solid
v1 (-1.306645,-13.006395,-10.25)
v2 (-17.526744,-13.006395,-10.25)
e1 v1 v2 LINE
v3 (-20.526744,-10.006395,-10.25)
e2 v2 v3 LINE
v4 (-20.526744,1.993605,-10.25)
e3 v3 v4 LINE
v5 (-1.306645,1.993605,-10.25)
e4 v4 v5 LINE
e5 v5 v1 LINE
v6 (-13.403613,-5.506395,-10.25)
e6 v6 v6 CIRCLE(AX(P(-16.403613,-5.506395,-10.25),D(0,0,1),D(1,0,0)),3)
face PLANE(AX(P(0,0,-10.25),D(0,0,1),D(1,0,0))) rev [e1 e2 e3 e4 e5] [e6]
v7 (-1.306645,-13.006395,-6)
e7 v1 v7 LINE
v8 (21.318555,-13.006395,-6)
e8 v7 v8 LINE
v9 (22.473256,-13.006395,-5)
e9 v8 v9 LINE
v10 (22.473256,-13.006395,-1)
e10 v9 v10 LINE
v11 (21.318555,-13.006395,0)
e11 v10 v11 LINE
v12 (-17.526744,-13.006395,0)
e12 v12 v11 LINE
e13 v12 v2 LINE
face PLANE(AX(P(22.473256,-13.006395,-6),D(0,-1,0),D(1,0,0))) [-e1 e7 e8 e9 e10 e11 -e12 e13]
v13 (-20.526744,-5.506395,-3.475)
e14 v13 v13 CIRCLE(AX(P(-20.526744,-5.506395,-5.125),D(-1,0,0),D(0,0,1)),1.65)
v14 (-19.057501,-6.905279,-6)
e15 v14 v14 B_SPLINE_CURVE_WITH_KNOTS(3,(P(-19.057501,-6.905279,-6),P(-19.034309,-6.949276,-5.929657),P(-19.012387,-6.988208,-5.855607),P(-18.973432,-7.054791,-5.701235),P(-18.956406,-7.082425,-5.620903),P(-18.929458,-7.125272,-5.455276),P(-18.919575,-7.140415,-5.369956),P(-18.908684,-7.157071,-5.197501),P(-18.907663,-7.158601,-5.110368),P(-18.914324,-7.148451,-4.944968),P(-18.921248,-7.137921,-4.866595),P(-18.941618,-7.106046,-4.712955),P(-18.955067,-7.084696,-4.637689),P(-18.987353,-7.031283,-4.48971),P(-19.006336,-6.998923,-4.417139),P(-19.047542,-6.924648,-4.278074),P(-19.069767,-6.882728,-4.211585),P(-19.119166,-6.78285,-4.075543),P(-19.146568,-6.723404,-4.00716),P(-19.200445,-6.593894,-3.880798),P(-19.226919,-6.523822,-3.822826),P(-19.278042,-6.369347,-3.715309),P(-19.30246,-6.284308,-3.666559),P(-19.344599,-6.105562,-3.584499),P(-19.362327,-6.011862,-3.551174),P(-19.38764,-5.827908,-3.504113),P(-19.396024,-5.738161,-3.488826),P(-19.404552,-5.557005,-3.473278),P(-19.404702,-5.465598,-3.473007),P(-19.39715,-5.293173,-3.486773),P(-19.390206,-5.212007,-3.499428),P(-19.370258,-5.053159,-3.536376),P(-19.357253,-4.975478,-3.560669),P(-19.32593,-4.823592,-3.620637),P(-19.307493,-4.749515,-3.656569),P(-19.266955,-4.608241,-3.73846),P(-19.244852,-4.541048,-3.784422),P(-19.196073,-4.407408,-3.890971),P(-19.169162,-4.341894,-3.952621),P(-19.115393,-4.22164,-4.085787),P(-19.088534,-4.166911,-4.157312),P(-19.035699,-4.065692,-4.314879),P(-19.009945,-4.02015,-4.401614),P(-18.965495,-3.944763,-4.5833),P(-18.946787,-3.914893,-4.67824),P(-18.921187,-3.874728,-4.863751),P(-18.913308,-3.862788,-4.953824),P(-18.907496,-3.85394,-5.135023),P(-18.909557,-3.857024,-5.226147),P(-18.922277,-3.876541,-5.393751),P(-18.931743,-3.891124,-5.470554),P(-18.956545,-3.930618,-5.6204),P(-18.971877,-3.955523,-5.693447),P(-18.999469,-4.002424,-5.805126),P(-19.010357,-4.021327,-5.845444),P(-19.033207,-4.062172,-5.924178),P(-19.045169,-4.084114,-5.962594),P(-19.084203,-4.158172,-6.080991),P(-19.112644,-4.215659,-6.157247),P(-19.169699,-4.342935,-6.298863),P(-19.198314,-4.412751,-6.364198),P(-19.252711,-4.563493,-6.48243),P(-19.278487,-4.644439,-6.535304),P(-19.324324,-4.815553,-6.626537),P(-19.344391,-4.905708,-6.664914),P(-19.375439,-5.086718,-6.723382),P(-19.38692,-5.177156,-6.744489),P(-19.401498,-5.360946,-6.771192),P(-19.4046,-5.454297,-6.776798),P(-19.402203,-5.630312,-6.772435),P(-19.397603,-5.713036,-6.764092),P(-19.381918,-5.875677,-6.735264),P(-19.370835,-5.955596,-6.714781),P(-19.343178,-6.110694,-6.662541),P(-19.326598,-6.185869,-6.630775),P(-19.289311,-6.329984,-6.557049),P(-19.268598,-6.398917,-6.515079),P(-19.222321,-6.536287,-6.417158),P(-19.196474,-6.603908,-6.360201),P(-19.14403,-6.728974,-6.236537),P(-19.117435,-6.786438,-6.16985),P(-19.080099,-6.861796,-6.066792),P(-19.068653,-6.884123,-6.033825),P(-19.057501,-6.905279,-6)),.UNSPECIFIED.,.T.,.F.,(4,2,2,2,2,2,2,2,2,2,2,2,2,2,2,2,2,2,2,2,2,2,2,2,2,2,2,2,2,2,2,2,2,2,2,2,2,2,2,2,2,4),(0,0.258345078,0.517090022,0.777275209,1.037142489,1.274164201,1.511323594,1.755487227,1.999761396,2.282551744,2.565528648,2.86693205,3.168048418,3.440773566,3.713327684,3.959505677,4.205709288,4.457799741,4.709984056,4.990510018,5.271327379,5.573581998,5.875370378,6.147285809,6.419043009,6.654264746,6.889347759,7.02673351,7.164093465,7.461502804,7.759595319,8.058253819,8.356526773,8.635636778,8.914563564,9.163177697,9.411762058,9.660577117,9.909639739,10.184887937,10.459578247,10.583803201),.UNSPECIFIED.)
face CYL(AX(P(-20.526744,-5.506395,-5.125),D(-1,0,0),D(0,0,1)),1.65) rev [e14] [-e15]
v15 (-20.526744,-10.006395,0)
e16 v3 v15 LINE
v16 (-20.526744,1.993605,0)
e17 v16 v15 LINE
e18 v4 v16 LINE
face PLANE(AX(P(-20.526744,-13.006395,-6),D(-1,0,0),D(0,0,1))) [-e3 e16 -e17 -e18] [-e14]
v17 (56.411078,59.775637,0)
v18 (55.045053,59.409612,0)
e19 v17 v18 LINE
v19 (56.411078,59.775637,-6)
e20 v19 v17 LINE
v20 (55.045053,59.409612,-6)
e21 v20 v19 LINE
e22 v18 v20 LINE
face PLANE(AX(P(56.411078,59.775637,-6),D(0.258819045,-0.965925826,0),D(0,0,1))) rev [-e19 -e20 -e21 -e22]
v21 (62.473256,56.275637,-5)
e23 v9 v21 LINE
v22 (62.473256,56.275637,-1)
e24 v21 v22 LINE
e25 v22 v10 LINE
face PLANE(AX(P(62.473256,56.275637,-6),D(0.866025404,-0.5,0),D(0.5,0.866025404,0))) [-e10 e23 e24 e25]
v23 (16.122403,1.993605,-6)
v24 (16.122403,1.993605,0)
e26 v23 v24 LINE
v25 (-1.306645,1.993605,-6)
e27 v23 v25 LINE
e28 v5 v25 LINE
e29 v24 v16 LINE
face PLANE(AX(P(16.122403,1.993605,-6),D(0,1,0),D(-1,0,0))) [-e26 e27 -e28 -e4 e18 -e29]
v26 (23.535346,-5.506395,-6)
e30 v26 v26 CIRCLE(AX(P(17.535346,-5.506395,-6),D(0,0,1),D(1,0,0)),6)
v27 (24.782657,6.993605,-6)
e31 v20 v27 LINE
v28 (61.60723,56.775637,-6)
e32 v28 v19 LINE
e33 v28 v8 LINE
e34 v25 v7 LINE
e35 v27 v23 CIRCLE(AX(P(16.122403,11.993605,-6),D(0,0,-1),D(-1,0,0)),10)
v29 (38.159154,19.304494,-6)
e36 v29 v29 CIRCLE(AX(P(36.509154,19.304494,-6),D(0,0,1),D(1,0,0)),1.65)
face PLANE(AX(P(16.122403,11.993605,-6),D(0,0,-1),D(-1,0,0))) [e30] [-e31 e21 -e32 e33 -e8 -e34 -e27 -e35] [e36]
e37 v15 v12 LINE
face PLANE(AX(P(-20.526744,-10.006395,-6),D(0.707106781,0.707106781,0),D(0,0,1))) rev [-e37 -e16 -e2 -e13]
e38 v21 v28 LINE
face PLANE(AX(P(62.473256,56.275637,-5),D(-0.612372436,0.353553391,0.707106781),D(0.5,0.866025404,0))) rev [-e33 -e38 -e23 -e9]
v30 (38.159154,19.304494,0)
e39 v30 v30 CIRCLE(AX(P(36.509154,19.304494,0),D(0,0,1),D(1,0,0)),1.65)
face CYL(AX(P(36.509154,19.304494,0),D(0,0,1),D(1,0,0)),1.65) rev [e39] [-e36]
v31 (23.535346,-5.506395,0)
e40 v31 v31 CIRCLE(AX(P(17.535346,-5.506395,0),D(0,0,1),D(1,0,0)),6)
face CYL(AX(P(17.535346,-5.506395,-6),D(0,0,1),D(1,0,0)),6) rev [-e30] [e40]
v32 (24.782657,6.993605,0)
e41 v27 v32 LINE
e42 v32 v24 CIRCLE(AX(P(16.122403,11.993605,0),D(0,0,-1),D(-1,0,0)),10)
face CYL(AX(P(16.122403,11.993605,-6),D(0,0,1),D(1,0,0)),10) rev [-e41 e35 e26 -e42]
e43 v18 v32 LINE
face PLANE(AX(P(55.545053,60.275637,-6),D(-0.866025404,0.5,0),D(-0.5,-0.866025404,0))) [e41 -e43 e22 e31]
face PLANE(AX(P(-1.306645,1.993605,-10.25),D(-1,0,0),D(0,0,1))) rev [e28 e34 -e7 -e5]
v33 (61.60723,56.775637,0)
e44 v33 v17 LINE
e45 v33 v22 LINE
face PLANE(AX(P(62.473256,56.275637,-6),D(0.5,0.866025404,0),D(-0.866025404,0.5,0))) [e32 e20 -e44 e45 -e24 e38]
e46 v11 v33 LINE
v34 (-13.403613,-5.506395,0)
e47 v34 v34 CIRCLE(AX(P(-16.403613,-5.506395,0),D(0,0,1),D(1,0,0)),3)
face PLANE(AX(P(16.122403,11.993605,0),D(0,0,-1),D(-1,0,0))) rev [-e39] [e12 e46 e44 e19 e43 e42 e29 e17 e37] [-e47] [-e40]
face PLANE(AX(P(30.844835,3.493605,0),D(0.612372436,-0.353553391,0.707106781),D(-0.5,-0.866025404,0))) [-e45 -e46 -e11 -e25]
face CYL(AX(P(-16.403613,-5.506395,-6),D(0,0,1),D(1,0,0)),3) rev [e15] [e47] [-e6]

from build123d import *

# Parameters (mm, degrees)
SKETCH1_R                       = 3
SKETCH1_R_2                     = 6
BOSS_EXTRUDE1_DEPTH             = 6
M4X0_7_TAPPED_HOLE1_D           = 3.3
CHAMFER1_SIZE                   = 3
CHAMFER2_SIZE                   = 1
BOSS_EXTRUDE2_DEPTH             = 4.25
M4X0_7_START                    = -20.526744186
M4X0_7_TAPPED_HOLE3_OUTLINE_R   = 1.65
M4X0_7_TAPPED_HOLE3_DEPTH       = 1.123131525
M4X0_7_START_2                  = -19.403612661
M4X0_7_TAPPED_HOLE3_2_OUTLINE_R = 1.65
M4X0_7_TAPPED_HOLE3_2_DEPTH     = 0.494491736
M4X0_7_START_3                  = -6.0000001
M4X0_7_TAPPED_HOLE3_3_DEPTH     = 6.0000002
M4X0_7_START_4                  = -6.7750001
M4X0_7_TAPPED_HOLE3_4_DEPTH     = 0.775
SKETCH14_R                      = 3
CUT_EXTRUDE1_DEPTH              = 87.67199356


with BuildPart() as part:
    # Sketch1 → Boss-Extrude1 (new body)
    with BuildSketch(Plane.XY):
        with BuildLine():
            Line((62.473255814, 56.275636954), (55.545052584, 60.275636954))
            Line((55.545052584, 60.275636954), (24.782656891, 6.993604651))
            ThreePointArc((24.782656891, 6.993604651), (21.122402853, 3.333350613), (16.122402853, 1.993604651))
            Line((16.122402853, 1.993604651), (-20.526744186, 1.993604651))
            Line((-20.526744186, 1.993604651), (-20.526744186, -13.006395349))
            Line((-20.526744186, -13.006395349), (22.473255814, -13.006395349))
            Line((22.473255814, -13.006395349), (62.473255814, 56.275636954))
        make_face()
        with Locations((-16.403612561, -5.506395349)):
            Circle(SKETCH1_R, mode=Mode.SUBTRACT)
        with Locations((17.535345593, -5.506395349)):
            Circle(SKETCH1_R_2, mode=Mode.SUBTRACT)
    extrude(amount=-BOSS_EXTRUDE1_DEPTH)

    # M4x0.7 Tapped Hole1 (through all)
    with Locations(Plane.XY):
        with Locations((36.509154199, 19.304493784)):
            Hole(M4X0_7_TAPPED_HOLE1_D / 2)

    # Chamfer1
    chamfer1_edges = [part.edges().sort_by_distance(p)[0] for p in [
        (-20.526744186, -13.006395349, -3),
    ]]
    chamfer(chamfer1_edges, length=CHAMFER1_SIZE)

    # Chamfer2
    chamfer2_edges = [part.edges().sort_by_distance(p)[0] for p in [
        (42.473255814, 21.634620803, -6),
        (55.545052584, 60.275636954, -3),
        (42.473255814, 21.634620803, 0),
    ]]
    chamfer(chamfer2_edges, length=CHAMFER2_SIZE)

    # Sketch6 → Boss-Extrude2 (add)
    with BuildSketch(Plane(origin=(0, 0, -6), x_dir=(-1, 0, 0), z_dir=(0, 0, -1))):
        Polygon((20.526744186, 1.993604651), (1.306644629, 1.993604651), (1.306644629, -13.006395349), (17.526744186, -13.006395349), (20.526744186, -10.006395349), align=None)
    extrude(amount=BOSS_EXTRUDE2_DEPTH)

    # M4x0.7 Tapped Hole3: read off the stored shape, not the designer's step
    # M4x0.7 Tapped Hole3 outline → M4x0.7 Tapped Hole3 (cut)
    with BuildSketch(Plane.YZ.offset(M4X0_7_START)):
        with Locations((-5.506395349, -5.125)):
            Circle(M4X0_7_TAPPED_HOLE3_OUTLINE_R)
    extrude(amount=M4X0_7_TAPPED_HOLE3_DEPTH, mode=Mode.SUBTRACT)

    # M4x0.7 Tapped Hole3 2 outline → M4x0.7 Tapped Hole3 2 (cut)
    with BuildSketch(Plane.YZ.offset(M4X0_7_START_2)):
        with Locations((-5.506395349, -5.125)):
            Circle(M4X0_7_TAPPED_HOLE3_2_OUTLINE_R)
    extrude(amount=M4X0_7_TAPPED_HOLE3_2_DEPTH, mode=Mode.SUBTRACT)

    # M4x0.7 Tapped Hole3 3 outline → M4x0.7 Tapped Hole3 3 (cut)
    with BuildSketch(Plane.XY.offset(M4X0_7_START_3)):
        with BuildLine():
            ThreePointArc((-18.909118414, -3.856413403), (-18.986363136, -3.980158321), (-19.057501217, -4.107511865))
            ThreePointArc((-19.057501217, -4.107511865), (-19.403612561, -5.506395898), (-19.057500704, -6.905279805))
            ThreePointArc((-19.057500704, -6.905279805), (-18.98636247, -7.032633505), (-18.909117577, -7.156378566))
            Line((-18.909117577, -7.156378566), (-18.909118414, -3.856413403))
        make_face()
    extrude(amount=M4X0_7_TAPPED_HOLE3_3_DEPTH, mode=Mode.SUBTRACT)

    # M4x0.7 Tapped Hole3 4 outline → M4x0.7 Tapped Hole3 4 (add)
    with BuildSketch(Plane.XY.offset(M4X0_7_START_4)):
        with BuildLine():
            ThreePointArc((-18.909118414, -3.856413403), (-18.986363136, -3.980158321), (-19.057501217, -4.107511865))
            ThreePointArc((-19.057501217, -4.107511865), (-19.403612561, -5.506395898), (-19.057500704, -6.905279805))
            ThreePointArc((-19.057500704, -6.905279805), (-18.98636247, -7.032633505), (-18.909117577, -7.156378566))
            Line((-18.909117577, -7.156378566), (-18.909118414, -3.856413403))
        make_face()
    extrude(amount=M4X0_7_TAPPED_HOLE3_4_DEPTH)

    # Sketch14 → Cut-Extrude1 (cut, through all)
    with BuildSketch(Plane.XY.offset(-6)):
        with Locations((-16.403612561, -5.506395349)):
            Circle(SKETCH14_R)
    extrude(amount=-CUT_EXTRUDE1_DEPTH, mode=Mode.SUBTRACT)


solid = part.part
